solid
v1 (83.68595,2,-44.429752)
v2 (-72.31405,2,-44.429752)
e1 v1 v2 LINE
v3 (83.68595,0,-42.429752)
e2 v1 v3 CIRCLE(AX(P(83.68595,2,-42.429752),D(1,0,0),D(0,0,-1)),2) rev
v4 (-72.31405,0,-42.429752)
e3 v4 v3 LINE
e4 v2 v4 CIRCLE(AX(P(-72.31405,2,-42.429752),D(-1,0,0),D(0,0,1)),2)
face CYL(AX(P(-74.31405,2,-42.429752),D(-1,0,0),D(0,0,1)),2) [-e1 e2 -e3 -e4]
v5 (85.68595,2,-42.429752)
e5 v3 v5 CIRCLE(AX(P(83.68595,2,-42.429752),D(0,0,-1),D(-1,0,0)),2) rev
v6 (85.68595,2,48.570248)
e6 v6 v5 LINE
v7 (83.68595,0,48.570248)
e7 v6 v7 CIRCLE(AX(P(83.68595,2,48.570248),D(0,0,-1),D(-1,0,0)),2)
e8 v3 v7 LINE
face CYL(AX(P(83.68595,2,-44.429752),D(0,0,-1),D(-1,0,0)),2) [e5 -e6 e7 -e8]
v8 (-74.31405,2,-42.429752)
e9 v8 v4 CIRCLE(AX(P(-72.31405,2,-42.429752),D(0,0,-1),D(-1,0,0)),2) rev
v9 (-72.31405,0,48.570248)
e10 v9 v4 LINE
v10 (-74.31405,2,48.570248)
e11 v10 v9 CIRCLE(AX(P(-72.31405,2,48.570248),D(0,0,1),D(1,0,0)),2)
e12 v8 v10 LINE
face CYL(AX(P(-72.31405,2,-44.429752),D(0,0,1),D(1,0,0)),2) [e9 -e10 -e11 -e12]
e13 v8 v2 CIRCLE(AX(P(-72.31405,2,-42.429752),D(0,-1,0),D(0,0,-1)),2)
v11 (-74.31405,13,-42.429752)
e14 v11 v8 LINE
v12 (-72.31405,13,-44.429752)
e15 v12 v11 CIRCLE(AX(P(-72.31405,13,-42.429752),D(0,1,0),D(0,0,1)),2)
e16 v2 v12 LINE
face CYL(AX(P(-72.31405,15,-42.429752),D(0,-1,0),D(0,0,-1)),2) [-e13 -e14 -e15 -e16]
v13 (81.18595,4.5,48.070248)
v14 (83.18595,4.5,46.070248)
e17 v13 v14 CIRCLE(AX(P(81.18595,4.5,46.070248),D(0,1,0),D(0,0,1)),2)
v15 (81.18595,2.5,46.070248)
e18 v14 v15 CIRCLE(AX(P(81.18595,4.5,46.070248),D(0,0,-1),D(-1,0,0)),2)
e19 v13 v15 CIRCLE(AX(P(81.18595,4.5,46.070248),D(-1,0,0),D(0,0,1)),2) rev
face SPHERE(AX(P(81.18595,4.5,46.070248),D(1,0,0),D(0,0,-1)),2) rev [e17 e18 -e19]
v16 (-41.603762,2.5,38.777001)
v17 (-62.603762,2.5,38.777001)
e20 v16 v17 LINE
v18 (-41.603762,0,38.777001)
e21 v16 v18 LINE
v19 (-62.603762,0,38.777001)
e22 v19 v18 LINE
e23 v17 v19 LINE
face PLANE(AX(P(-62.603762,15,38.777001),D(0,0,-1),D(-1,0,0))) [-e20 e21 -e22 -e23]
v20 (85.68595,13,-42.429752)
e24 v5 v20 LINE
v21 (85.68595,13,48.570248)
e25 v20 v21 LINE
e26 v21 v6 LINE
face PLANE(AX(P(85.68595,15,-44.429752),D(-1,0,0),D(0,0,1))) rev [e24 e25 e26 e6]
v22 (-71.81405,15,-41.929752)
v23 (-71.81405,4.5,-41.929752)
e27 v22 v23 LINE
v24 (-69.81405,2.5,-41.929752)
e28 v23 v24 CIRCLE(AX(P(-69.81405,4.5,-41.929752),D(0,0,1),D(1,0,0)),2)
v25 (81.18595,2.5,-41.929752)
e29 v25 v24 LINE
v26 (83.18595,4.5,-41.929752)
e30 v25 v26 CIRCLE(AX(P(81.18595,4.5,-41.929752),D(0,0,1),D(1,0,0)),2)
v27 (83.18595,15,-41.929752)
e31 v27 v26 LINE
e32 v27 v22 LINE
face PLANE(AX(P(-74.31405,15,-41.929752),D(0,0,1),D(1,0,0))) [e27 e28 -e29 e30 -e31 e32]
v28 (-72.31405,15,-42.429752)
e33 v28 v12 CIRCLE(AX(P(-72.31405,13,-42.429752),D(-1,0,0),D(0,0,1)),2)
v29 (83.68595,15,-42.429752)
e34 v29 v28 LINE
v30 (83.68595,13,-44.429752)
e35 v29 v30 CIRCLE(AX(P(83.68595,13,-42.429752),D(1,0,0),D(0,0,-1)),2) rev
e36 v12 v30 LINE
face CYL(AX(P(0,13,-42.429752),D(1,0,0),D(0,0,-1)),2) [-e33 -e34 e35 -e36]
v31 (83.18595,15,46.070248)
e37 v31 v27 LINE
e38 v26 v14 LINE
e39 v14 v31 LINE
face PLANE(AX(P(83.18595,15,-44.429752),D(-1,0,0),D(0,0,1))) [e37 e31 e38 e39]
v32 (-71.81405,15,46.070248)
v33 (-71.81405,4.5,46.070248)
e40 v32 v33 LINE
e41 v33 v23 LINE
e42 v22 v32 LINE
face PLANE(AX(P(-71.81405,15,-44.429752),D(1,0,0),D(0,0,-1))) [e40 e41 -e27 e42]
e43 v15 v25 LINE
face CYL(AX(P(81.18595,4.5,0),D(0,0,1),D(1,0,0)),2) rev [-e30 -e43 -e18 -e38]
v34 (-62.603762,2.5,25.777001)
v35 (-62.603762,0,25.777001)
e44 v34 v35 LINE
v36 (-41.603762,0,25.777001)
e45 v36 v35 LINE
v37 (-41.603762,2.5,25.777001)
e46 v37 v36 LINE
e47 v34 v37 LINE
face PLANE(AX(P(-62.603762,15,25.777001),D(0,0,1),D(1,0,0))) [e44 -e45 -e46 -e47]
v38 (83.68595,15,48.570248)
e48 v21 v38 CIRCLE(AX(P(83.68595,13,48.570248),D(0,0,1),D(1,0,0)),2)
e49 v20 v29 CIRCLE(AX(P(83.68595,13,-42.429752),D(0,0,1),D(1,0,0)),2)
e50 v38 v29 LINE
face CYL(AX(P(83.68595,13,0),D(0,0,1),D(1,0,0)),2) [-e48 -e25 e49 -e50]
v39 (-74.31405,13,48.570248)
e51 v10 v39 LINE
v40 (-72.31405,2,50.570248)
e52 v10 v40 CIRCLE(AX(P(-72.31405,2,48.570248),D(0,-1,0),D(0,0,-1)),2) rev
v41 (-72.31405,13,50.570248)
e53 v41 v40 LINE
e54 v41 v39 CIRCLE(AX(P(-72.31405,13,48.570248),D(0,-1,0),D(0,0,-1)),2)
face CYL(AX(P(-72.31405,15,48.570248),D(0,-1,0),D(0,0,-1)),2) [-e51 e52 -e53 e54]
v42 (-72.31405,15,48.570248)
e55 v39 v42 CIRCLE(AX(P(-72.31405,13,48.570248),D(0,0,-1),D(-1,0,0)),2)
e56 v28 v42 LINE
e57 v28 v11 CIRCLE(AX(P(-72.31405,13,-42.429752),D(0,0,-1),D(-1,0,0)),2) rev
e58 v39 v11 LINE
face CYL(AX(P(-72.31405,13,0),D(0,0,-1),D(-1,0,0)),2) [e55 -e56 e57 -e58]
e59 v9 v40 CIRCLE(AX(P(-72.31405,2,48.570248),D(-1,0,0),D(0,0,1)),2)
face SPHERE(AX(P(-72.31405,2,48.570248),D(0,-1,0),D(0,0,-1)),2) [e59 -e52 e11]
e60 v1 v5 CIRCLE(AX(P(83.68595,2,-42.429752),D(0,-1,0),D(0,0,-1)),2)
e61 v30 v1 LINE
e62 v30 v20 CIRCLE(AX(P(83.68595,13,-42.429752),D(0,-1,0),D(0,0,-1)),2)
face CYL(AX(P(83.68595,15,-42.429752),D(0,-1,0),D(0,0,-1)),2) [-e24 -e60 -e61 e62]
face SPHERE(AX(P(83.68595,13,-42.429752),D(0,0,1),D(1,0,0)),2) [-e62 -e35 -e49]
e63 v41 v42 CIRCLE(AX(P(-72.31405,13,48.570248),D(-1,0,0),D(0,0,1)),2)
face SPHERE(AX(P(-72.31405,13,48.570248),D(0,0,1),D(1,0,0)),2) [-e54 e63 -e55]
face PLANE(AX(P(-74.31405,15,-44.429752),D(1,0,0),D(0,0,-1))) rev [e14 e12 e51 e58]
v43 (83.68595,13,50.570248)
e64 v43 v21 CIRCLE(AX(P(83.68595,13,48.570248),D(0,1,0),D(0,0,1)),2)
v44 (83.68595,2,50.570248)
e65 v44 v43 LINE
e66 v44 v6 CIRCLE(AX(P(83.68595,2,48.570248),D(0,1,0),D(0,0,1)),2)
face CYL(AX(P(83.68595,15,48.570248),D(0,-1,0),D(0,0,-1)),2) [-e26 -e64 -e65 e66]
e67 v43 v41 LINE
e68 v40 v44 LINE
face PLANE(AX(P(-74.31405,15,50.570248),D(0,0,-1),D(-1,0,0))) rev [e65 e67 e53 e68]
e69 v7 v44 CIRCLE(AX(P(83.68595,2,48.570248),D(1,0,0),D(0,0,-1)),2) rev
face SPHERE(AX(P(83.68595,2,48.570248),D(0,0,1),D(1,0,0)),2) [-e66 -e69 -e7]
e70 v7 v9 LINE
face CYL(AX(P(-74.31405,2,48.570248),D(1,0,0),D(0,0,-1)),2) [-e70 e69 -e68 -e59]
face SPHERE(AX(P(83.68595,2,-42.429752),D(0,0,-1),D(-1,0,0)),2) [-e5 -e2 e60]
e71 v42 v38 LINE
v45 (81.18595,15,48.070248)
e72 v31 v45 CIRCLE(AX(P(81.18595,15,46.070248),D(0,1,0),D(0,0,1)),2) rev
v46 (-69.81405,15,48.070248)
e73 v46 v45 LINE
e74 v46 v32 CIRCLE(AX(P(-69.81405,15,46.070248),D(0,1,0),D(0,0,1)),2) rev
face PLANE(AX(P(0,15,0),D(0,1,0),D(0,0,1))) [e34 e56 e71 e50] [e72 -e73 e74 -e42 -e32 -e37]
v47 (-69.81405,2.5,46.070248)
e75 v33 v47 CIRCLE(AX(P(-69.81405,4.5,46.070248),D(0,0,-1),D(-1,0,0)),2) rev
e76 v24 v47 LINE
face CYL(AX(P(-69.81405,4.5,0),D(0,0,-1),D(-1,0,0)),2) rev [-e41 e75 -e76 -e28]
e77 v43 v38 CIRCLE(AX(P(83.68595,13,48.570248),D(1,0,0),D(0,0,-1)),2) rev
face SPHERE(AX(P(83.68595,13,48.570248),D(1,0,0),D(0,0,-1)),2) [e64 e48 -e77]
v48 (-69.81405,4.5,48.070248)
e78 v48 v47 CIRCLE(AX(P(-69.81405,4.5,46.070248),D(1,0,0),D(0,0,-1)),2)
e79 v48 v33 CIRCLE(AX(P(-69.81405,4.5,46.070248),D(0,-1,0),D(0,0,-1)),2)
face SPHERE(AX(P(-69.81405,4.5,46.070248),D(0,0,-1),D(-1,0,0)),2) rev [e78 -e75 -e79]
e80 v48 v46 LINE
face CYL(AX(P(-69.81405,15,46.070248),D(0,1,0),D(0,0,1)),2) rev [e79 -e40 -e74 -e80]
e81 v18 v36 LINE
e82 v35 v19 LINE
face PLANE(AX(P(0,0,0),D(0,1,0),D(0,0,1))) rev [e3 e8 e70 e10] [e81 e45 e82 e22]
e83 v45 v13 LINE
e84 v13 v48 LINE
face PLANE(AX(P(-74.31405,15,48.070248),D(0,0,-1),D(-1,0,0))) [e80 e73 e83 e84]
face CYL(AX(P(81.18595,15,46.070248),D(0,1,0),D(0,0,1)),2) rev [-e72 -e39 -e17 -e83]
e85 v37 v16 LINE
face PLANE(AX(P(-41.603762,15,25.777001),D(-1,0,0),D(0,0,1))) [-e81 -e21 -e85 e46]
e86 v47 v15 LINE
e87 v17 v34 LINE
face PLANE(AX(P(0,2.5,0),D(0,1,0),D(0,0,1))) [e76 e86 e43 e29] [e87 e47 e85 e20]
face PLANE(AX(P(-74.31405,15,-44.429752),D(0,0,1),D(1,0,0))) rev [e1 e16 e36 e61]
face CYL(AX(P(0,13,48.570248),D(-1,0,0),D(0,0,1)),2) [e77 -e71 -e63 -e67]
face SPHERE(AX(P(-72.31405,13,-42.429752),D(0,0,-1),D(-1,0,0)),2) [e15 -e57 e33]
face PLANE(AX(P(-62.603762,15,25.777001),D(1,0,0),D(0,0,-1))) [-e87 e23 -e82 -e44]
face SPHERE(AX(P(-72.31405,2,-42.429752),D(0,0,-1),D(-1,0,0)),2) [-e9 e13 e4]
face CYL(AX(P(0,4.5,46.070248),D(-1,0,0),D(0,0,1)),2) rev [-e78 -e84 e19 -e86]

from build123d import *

# Parameters (mm, degrees)
SKETCH1_W           = 160
SKETCH1_H           = 95
BOSS_EXTRUDE1_DEPTH = 15
SHELL1_T            = -2.5
SKETCH2_W           = 21
SKETCH2_H           = 13
CUT_EXTRUDE1_DEPTH  = 15
FILLET2_R           = 2
FILLET8_R           = 2
FILLET13_R          = 2


with BuildPart() as part:
    # Sketch1 → Boss-Extrude1 (new body)
    with BuildSketch(Plane(origin=(0, 0, 0), x_dir=(1, 0, 0), z_dir=(0, 1, 0))):
        with Locations((5.685950413, -3.070247934)):
            Rectangle(SKETCH1_W, SKETCH1_H)
    extrude(amount=BOSS_EXTRUDE1_DEPTH)

    # Shell1
    shell1_openings = [part.faces().sort_by_distance(p)[0] for p in [
        (5.685950413, 15, 3.070247934),
    ]]
    offset(amount=SHELL1_T, openings=shell1_openings, kind=Kind.INTERSECTION)

    # Sketch2 → Cut-Extrude1 (cut)
    with BuildSketch(Plane(origin=(0, 0, 0), x_dir=(1, 0, 0), z_dir=(0, 1, 0))):
        with Locations((-52.103761913, -32.277000916)):
            Rectangle(SKETCH2_W, SKETCH2_H)
    extrude(amount=CUT_EXTRUDE1_DEPTH, mode=Mode.SUBTRACT)

    # Fillet2
    fillet2_edges = [part.edges().sort_by_distance(p)[0] for p in [
        (5.685950413, 15, -44.429752066),
        (-74.314049587, 15, 3.070247934),
        (5.685950413, 0, -44.429752066),
        (85.685950413, 0, 3.070247934),
        (5.685950413, 0, 50.570247934),
        (-74.314049587, 0, 3.070247934),
        (-74.314049587, 7.5, -44.429752066),
        (85.685950413, 7.5, -44.429752066),
        (-74.314049587, 7.5, 50.570247934),
    ]]
    fillet(fillet2_edges, radius=FILLET2_R)

    # Fillet8
    # the kernel refuses this fillet: 2 mm, written as the material it adds along each edge
    with BuildSketch(Plane(origin=(-71.814049587, 2.5, -41.929752066), x_dir=(0, 1, 0), z_dir=(0, 0, 1))) as fillet8_piece_1:
        with BuildLine():
            CenterArc((FILLET8_R, -FILLET8_R), FILLET8_R, 90, 90)
            Line((0, -FILLET8_R), (0, 0))
            Line((0, 0), (FILLET8_R, 0))
        make_face()
    extrude(amount=90)
    # the kernel refuses this fillet: 2 mm, written as the material it takes off along each edge
    with BuildSketch(Plane(origin=(83.685950413, 13, -42.429752066), x_dir=(1, 0, 0), z_dir=(0, 1, 0))) as fillet8_2_piece_1_section:
        Polygon((0, 0), (FILLET8_R * 1.02, 0), (FILLET8_R * 1.02, FILLET8_R * 1.02), (0, FILLET8_R * 1.02), align=None)
    fillet8_2_piece_1 = extrude(amount=FILLET8_R * 1.02, mode=Mode.PRIVATE)
    fillet8_2_piece_1 = fillet8_2_piece_1 - Plane(origin=(83.685950413, 13, -42.429752066), x_dir=(-0.7071067811865476, 0, 0.7071067811865475), z_dir=(0, 1, 0)) * Sphere(FILLET8_R, mode=Mode.PRIVATE)
    add(fillet8_2_piece_1, mode=Mode.SUBTRACT)
    with BuildSketch(Plane(origin=(83.685950413, 2, 48.570247934), x_dir=(0, 0, 1), z_dir=(1, 0, 0))) as fillet8_2_piece_2_section:
        Polygon((0, 0), (FILLET8_R * 1.02, 0), (FILLET8_R * 1.02, FILLET8_R * 1.02), (0, FILLET8_R * 1.02), align=None)
    fillet8_2_piece_2 = extrude(amount=FILLET8_R * 1.02, mode=Mode.PRIVATE)
    fillet8_2_piece_2 = fillet8_2_piece_2 - Plane(origin=(83.685950413, 2, 48.570247934), x_dir=(0, 0.7071067811865475, -0.7071067811865475), z_dir=(1, 0, 0)) * Sphere(FILLET8_R, mode=Mode.PRIVATE)
    add(fillet8_2_piece_2, mode=Mode.SUBTRACT)
    with BuildSketch(Plane(origin=(-72.314049587, 13, 48.570247934), x_dir=(0, 0, 1), z_dir=(0, 1, 0))) as fillet8_2_piece_3_section:
        Polygon((0, 0), (FILLET8_R * 1.02, 0), (FILLET8_R * 1.02, -FILLET8_R * 1.02), (0, -FILLET8_R * 1.02), align=None)
    fillet8_2_piece_3 = extrude(amount=FILLET8_R * 1.02, mode=Mode.PRIVATE)
    fillet8_2_piece_3 = fillet8_2_piece_3 - Plane(origin=(-72.314049587, 13, 48.570247934), x_dir=(0.7071067811865475, 0, -0.7071067811865475), z_dir=(0, 1, 0)) * Sphere(FILLET8_R, mode=Mode.PRIVATE)
    add(fillet8_2_piece_3, mode=Mode.SUBTRACT)
    with BuildSketch(Plane(origin=(83.685950413, 13, 48.570247934), x_dir=(0, 0, 1), z_dir=(1, 0, 0))) as fillet8_2_piece_4_section:
        Polygon((0, 0), (FILLET8_R * 1.02, 0), (FILLET8_R * 1.02, -FILLET8_R * 1.02), (0, -FILLET8_R * 1.02), align=None)
    fillet8_2_piece_4 = extrude(amount=FILLET8_R * 1.02, mode=Mode.PRIVATE)
    fillet8_2_piece_4 = fillet8_2_piece_4 - Plane(origin=(83.685950413, 13, 48.570247934), x_dir=(0, -0.7071067811865475, -0.7071067811865475), z_dir=(1, 0, 0)) * Sphere(FILLET8_R, mode=Mode.PRIVATE)
    add(fillet8_2_piece_4, mode=Mode.SUBTRACT)
    with BuildSketch(Plane(origin=(85.685950413, 15, -42.429752066), x_dir=(-1, 0, 0), z_dir=(0, 0, 1))) as fillet8_2_piece_5:
        with BuildLine():
            CenterArc((FILLET8_R, FILLET8_R), FILLET8_R, 180, 90)
            Line((0, FILLET8_R), (0, 0))
            Line((0, 0), (FILLET8_R, 0))
        make_face()
    extrude(amount=91, mode=Mode.SUBTRACT)
    with BuildSketch(Plane(origin=(83.685950413, 15, 50.570247934), x_dir=(0, 0, -1), z_dir=(-1, 0, 0))) as fillet8_2_piece_6:
        with BuildLine():
            CenterArc((FILLET8_R, FILLET8_R), FILLET8_R, 180, 90)
            Line((0, FILLET8_R), (0, 0))
            Line((0, 0), (FILLET8_R, 0))
        make_face()
    extrude(amount=156, mode=Mode.SUBTRACT)
    with BuildSketch(Plane(origin=(85.685950413, 2, 50.570247934), x_dir=(0, 0, -1), z_dir=(0, 1, 0))) as fillet8_2_piece_7:
        with BuildLine():
            CenterArc((FILLET8_R, FILLET8_R), FILLET8_R, 180, 90)
            Line((0, FILLET8_R), (0, 0))
            Line((0, 0), (FILLET8_R, 0))
        make_face()
    extrude(amount=11, mode=Mode.SUBTRACT)

    # Fillet13
    fillet13_edges = [part.edges().sort_by_distance(p)[0] for p in [
        (-71.814049587, 9.75, 48.070247934),
        (83.185950413, 2.5, 3.070247934),
        (83.185950413, 8.75, 48.070247934),
        (6.685950413, 2.5, 48.070247934),
        (-71.228263149, 3.085786438, 48.070247934),
    ]]
    fillet(fillet13_edges, radius=FILLET13_R)


solid = part.part
